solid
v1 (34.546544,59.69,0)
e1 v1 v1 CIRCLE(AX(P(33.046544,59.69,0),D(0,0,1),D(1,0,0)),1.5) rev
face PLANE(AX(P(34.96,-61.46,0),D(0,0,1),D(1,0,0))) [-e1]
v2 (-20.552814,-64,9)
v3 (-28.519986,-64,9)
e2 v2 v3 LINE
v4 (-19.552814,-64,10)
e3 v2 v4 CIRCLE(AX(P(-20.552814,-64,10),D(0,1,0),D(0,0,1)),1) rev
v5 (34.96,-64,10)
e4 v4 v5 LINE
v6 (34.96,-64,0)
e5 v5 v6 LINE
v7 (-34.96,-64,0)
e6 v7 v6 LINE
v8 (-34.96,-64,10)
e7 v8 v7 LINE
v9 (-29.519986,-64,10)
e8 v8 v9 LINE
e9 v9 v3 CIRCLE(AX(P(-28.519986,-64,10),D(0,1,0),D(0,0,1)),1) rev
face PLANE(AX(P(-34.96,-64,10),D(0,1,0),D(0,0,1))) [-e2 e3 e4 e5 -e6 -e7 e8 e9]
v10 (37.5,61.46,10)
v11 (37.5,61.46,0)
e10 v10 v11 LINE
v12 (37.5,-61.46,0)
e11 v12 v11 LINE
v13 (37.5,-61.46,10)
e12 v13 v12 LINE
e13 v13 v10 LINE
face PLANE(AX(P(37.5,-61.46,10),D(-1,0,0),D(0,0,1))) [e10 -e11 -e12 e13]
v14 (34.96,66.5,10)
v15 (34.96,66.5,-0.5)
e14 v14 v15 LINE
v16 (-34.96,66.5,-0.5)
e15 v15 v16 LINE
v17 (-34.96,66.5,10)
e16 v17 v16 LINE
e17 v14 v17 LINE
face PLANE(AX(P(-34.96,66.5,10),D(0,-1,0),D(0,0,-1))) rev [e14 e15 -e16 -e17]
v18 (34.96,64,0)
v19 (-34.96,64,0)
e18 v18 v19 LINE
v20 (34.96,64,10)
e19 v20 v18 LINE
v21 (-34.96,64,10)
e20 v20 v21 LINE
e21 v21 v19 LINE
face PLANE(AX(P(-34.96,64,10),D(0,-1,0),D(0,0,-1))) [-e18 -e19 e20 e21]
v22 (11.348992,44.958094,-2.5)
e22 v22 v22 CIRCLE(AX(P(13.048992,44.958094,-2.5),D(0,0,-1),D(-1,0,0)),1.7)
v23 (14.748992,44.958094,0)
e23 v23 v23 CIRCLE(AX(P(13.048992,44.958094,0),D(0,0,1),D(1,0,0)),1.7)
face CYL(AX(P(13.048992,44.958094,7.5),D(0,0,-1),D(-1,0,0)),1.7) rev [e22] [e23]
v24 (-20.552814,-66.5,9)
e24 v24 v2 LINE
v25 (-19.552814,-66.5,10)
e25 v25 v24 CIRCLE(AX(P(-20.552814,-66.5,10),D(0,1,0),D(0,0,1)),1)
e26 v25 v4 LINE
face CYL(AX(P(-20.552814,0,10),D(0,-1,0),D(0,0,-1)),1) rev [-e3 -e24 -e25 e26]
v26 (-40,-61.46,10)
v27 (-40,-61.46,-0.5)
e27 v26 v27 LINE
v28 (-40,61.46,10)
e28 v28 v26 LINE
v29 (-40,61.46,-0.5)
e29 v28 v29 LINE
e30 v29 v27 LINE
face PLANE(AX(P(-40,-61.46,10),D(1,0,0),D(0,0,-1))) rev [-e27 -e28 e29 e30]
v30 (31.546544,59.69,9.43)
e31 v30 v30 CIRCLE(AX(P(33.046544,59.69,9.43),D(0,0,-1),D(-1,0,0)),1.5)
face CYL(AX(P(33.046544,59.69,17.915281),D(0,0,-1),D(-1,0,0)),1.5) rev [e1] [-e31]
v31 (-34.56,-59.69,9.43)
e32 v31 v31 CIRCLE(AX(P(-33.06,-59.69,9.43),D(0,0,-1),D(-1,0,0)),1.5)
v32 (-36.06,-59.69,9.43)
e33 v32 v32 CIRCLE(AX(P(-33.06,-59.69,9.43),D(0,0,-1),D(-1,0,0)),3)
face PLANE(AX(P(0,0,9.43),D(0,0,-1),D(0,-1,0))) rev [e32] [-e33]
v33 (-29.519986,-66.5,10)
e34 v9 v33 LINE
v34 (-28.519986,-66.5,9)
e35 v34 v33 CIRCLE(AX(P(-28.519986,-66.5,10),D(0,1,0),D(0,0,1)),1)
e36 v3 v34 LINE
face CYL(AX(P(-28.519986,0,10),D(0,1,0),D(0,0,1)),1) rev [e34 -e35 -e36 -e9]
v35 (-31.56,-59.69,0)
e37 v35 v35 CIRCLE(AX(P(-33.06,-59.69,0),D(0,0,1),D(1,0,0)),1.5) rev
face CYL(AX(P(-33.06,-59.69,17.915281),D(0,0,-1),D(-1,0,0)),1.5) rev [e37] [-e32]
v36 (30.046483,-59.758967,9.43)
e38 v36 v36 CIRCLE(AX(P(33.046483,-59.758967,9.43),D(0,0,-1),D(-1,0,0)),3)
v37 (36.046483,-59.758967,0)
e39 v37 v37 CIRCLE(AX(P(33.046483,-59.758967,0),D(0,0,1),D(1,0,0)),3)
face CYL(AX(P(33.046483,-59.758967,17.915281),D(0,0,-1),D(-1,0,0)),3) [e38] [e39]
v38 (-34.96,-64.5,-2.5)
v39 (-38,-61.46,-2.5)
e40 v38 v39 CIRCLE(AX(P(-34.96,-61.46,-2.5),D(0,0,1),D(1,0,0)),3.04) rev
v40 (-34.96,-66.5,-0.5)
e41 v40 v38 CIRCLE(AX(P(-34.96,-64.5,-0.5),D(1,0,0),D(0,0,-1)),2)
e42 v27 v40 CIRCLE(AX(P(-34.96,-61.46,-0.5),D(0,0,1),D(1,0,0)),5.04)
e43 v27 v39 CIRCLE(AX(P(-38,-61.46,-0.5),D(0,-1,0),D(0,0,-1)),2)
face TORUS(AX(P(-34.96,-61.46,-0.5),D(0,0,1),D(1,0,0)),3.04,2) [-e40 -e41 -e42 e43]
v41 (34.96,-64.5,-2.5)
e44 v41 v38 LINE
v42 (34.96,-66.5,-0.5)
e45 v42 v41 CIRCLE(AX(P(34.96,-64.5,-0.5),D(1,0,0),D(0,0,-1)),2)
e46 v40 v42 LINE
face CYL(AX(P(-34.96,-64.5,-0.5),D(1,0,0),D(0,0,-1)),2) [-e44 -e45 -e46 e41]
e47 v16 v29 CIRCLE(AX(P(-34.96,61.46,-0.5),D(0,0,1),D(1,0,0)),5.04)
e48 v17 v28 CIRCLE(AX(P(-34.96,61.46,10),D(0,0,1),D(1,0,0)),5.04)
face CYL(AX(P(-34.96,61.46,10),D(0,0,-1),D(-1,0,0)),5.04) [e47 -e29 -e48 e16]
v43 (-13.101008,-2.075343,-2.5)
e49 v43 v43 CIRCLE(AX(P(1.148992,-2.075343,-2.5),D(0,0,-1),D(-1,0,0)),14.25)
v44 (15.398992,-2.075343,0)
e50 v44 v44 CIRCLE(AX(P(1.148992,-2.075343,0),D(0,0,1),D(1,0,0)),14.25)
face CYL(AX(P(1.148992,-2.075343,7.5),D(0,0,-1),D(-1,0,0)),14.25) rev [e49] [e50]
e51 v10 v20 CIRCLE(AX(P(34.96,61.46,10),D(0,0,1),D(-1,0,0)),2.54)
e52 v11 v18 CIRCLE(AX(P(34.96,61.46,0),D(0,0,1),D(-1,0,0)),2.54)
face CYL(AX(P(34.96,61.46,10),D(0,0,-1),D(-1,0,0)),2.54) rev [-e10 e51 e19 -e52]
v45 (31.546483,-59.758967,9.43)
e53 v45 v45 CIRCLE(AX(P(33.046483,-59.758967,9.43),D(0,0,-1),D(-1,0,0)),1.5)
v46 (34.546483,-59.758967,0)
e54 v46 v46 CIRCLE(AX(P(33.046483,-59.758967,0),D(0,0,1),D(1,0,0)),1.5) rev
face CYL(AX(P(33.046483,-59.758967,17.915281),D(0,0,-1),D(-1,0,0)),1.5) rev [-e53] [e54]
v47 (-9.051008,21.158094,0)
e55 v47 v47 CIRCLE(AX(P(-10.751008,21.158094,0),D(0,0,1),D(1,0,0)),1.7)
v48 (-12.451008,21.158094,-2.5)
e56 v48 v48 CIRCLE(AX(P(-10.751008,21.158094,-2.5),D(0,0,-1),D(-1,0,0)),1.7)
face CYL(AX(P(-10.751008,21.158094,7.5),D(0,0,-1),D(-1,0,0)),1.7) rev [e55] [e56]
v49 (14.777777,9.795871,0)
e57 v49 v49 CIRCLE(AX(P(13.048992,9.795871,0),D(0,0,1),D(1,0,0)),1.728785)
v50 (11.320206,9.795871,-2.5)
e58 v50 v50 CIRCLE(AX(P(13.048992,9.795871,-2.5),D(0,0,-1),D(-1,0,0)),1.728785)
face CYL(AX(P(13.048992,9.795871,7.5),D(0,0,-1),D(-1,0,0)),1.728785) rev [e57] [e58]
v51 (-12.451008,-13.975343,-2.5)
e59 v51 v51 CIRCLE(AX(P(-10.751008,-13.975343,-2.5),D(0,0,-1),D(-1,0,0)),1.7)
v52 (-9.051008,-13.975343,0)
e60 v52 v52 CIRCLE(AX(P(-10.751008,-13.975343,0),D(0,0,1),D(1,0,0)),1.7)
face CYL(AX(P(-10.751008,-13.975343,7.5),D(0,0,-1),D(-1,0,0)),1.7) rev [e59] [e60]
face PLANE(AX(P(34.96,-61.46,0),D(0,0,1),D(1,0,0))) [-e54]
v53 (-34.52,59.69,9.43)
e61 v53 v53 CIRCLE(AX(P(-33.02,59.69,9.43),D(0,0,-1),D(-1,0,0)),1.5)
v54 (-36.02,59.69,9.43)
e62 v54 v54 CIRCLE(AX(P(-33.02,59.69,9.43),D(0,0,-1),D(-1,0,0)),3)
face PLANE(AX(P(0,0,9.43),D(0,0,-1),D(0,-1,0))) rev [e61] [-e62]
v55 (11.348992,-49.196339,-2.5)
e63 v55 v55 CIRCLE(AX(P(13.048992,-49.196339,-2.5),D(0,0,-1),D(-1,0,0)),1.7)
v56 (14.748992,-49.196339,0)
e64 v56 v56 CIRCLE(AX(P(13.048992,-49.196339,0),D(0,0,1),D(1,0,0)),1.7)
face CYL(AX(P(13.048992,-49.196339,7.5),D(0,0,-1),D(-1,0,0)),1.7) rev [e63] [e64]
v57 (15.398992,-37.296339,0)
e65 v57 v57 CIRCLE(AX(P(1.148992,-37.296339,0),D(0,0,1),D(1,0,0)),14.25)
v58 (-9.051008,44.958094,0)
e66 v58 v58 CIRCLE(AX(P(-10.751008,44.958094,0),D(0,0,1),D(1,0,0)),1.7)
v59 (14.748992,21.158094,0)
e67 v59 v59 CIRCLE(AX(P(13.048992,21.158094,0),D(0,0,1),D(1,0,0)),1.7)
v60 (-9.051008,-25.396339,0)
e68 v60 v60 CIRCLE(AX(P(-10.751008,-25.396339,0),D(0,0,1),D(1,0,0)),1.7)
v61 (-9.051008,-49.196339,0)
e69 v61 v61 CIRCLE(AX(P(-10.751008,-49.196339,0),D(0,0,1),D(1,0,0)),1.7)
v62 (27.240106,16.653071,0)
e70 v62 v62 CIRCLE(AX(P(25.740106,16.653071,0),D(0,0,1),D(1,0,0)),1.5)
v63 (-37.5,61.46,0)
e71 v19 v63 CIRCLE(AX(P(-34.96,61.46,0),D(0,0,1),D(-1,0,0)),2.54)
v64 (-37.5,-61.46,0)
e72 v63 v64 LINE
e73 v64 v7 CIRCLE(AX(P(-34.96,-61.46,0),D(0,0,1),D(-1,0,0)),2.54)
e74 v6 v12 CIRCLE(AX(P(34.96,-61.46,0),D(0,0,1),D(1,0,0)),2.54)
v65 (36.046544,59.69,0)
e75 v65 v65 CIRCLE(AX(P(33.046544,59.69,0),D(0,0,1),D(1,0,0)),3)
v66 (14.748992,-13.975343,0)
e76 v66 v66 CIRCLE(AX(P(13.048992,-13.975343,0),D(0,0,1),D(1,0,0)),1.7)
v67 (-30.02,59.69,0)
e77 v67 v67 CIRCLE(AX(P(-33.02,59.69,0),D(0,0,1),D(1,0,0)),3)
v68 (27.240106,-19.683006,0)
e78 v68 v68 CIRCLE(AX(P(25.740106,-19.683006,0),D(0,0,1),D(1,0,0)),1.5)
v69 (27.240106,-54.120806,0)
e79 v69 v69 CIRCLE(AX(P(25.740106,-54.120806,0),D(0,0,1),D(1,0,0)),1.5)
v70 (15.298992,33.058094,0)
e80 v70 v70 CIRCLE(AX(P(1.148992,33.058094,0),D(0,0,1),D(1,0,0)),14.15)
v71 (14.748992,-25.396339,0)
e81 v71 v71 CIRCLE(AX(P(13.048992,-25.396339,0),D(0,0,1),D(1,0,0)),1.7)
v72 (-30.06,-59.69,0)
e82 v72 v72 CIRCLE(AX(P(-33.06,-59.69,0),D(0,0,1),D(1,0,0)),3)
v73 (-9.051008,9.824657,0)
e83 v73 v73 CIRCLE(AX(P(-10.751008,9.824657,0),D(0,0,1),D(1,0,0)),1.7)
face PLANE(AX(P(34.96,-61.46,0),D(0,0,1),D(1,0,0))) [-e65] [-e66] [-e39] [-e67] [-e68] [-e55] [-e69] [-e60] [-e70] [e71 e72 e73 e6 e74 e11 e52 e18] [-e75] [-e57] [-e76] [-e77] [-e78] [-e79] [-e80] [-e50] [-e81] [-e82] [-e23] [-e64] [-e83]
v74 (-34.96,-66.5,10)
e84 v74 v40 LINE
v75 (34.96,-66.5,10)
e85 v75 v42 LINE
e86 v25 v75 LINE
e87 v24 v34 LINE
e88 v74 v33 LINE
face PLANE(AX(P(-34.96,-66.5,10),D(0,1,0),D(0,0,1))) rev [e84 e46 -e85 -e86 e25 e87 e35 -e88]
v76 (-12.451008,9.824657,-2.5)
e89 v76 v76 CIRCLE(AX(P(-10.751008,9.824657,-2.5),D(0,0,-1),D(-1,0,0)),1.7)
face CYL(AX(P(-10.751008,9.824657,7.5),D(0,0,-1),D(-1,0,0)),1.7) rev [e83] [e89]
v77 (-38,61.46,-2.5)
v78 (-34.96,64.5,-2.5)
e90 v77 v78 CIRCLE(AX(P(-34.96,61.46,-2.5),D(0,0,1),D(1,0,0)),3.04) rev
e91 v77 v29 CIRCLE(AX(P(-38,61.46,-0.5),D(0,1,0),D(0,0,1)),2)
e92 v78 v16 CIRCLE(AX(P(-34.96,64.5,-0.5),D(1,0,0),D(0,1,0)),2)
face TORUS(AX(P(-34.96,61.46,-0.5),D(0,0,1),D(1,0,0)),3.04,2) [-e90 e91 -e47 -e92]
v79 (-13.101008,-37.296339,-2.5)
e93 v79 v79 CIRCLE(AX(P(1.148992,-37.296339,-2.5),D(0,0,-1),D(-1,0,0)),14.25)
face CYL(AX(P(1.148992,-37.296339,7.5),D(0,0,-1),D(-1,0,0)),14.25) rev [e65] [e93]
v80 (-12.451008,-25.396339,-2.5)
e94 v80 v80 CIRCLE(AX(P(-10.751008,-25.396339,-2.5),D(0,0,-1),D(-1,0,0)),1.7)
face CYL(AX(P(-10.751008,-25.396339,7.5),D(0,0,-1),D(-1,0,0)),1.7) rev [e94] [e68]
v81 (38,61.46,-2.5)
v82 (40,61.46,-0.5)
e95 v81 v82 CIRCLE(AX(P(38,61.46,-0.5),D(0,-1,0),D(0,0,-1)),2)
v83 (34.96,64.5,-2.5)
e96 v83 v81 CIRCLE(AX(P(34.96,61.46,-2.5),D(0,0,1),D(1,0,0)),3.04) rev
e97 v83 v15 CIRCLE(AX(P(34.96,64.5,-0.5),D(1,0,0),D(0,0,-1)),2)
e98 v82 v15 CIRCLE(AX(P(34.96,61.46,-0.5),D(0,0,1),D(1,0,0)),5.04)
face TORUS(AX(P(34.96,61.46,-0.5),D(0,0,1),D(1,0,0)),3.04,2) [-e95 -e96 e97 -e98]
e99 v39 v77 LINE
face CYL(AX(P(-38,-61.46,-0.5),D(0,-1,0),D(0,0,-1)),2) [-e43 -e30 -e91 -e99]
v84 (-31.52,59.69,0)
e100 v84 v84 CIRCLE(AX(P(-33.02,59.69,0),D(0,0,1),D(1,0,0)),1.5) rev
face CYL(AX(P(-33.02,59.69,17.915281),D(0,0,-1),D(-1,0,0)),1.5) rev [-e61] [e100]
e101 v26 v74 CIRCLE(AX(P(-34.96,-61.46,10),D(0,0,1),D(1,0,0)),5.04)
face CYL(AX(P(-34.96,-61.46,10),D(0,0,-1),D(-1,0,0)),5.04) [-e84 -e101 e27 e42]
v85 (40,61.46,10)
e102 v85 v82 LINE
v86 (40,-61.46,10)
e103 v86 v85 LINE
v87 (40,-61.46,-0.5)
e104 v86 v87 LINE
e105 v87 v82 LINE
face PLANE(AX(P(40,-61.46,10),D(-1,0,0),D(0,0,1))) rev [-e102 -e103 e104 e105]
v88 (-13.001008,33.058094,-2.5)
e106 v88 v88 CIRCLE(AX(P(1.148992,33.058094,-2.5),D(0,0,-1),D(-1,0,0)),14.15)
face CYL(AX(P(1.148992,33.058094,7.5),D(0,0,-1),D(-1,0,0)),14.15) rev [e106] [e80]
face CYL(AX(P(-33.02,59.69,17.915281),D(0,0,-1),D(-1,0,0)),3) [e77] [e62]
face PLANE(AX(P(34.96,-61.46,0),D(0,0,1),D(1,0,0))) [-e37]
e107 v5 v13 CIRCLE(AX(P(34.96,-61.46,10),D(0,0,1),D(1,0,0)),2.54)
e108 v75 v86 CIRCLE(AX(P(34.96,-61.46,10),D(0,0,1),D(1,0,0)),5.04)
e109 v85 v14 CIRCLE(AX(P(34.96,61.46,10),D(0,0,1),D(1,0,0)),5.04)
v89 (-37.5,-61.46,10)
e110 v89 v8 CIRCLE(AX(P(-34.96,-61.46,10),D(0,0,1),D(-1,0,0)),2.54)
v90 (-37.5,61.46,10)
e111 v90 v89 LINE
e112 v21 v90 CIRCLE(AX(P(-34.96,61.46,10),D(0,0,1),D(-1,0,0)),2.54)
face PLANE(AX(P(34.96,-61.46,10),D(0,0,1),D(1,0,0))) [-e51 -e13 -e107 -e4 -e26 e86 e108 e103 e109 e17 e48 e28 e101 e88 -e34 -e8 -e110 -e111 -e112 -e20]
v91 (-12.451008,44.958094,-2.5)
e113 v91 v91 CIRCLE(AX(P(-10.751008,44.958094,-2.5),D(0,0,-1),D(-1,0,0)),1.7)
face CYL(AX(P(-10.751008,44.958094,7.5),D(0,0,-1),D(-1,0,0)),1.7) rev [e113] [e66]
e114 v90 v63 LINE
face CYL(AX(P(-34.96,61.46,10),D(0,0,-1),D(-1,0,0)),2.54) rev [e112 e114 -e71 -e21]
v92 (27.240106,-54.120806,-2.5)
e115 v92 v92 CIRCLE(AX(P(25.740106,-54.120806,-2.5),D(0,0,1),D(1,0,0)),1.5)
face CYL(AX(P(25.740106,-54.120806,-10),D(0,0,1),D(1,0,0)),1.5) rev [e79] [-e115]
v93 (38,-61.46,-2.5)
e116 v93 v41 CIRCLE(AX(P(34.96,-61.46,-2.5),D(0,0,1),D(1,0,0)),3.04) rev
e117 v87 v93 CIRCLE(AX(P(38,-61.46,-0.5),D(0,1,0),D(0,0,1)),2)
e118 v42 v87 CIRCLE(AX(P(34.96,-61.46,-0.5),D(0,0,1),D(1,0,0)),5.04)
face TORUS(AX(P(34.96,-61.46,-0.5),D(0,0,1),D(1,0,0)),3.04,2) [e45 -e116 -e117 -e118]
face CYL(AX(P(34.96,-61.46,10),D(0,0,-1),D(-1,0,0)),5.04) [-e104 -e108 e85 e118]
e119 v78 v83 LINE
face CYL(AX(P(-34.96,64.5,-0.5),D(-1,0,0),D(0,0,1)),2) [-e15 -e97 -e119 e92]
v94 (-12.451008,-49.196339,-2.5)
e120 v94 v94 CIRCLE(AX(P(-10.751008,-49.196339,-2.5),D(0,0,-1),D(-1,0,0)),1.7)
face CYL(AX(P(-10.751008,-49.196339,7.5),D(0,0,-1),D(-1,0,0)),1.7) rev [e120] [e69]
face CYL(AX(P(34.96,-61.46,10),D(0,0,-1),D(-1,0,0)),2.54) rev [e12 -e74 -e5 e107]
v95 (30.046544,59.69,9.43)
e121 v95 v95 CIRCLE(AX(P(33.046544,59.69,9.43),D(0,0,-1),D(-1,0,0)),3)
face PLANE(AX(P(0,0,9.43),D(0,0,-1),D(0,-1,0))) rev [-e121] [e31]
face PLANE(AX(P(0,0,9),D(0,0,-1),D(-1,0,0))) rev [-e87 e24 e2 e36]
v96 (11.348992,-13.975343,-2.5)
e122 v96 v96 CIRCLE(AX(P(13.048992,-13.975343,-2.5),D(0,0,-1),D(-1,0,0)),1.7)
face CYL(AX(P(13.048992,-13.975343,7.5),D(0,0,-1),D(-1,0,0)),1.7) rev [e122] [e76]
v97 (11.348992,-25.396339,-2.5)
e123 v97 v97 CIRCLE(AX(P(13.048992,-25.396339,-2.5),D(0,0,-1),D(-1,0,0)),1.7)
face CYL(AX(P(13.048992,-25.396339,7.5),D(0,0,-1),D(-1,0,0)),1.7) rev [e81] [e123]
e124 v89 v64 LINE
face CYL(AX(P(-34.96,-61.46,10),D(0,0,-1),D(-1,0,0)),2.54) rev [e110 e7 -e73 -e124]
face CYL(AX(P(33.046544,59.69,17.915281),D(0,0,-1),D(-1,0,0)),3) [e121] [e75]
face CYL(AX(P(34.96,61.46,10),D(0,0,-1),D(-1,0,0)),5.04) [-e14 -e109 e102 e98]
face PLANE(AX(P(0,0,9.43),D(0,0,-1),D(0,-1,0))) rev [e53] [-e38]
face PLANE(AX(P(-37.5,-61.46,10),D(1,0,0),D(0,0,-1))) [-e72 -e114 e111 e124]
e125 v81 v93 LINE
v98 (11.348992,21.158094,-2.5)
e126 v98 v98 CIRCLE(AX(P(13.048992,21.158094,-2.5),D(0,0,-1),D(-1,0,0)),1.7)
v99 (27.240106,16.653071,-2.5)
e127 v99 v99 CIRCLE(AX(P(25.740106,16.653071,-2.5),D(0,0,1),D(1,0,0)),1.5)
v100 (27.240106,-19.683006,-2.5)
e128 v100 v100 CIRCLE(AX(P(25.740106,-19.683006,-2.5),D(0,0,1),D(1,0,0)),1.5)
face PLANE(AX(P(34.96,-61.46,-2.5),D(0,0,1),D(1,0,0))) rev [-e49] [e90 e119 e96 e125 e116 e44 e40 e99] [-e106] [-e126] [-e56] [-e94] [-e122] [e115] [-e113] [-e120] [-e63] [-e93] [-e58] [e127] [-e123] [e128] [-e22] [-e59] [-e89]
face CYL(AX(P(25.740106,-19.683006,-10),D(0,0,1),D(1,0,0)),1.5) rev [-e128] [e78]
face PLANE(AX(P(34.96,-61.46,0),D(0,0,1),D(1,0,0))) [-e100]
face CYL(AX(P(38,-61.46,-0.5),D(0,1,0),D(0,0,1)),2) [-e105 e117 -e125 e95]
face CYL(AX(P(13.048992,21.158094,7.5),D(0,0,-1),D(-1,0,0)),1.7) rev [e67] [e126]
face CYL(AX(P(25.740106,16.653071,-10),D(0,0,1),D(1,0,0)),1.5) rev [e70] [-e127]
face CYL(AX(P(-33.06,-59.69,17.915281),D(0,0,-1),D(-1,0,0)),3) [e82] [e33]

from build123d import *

# Parameters (mm, degrees)
BOSS_EXTRU_1_DEPTH      = 10
COQUE1_T                = 2.5
CONG_1_R                = 2
ESQUISSE3_R             = 3
ESQUISSE3_R_2           = 1.5
BOSS_EXTRU_2_DEPTH      = 9.43
ESQUISSE4_W             = 9.967172774
ESQUISSE4_H             = 2.559848265
ENL_V_MAT_EXTRU_2_DEPTH = 1
CONG_4_R                = 1
ESQUISSE5_R             = 1.7
ESQUISSE5_R_2           = 1.728785314
ESQUISSE5_R_3           = 14.25
ESQUISSE5_R_4           = 14.15
ENL_V_MAT_EXTRU_3_DEPTH = 10
ESQUISSE6_R             = 1.5
ENL_V_MAT_EXTRU_4_DEPTH = 10


# Some blends are built 0.0001 mm under size
with BuildPart() as part:
    # Esquisse1 → Boss.-Extru.1 (new body)
    with BuildSketch(Plane.XY):
        with BuildLine():
            Line((-34.96, -64), (34.96, -64))
            ThreePointArc((34.96, -64), (36.756051224, -63.256051224), (37.5, -61.46))
            Line((37.5, -61.46), (37.5, 61.46))
            ThreePointArc((37.5, 61.46), (36.756051224, 63.256051224), (34.96, 64))
            Line((34.96, 64), (-34.96, 64))
            ThreePointArc((-34.96, 64), (-36.756051224, 63.256051224), (-37.5, 61.46))
            Line((-37.5, 61.46), (-37.5, -61.46))
            ThreePointArc((-37.5, -61.46), (-36.756051224, -63.256051224), (-34.96, -64))
        make_face()
    extrude(amount=BOSS_EXTRU_1_DEPTH)

    # Coque1
    coque1_openings = [part.faces().sort_by_distance(p)[0] for p in [
        (0, 0, 10),
    ]]
    offset(amount=COQUE1_T, openings=coque1_openings, kind=Kind.INTERSECTION)

    # Congé1
    # the kernel refuses this fillet: 2 mm, written as the material it takes off along each edge
    with BuildSketch(Plane(origin=(34.96, 66.5, -2.5), x_dir=(0, 0, 1), z_dir=(-1, 0, 0)), Plane(origin=(-34.96, -66.5, -2.5), x_dir=(0, 0, 1), z_dir=(1, 0, 0))) as cong_1_piece_1:
        with BuildLine():
            CenterArc((CONG_1_R, -CONG_1_R), CONG_1_R, 90, 90)
            Line((0, -CONG_1_R), (0, 0))
            Line((0, 0), (CONG_1_R, 0))
        make_face()
    extrude(amount=69.92, mode=Mode.SUBTRACT)
    with BuildSketch(Plane(origin=(34.96, 61.46, -2.5), x_dir=(0, 1, 0), z_dir=(-1, 0, 0))) as cong_1_piece_2:
        with BuildLine():
            CenterArc((5.04 - CONG_1_R, -CONG_1_R), CONG_1_R, 0, 90)
            Line((5.04 - CONG_1_R, 0), (5.04, 0))
            Line((5.04, 0), (5.04, -CONG_1_R))
        make_face()
    revolve(axis=Axis((34.96, 61.46, -2.5), (0, 0, -1)), revolution_arc=90, mode=Mode.SUBTRACT)
    with BuildSketch(Plane(origin=(40, -61.46, -2.5), x_dir=(0, 0, 1), z_dir=(0, 1, 0)), Plane(origin=(-40, 61.46, -2.5), x_dir=(0, 0, 1), z_dir=(0, -1, 0))) as cong_1_piece_3:
        with BuildLine():
            CenterArc((CONG_1_R, -CONG_1_R), CONG_1_R, 90, 90)
            Line((0, -CONG_1_R), (0, 0))
            Line((0, 0), (CONG_1_R, 0))
        make_face()
    extrude(amount=122.92, mode=Mode.SUBTRACT)
    with BuildSketch(Plane(origin=(34.96, -61.46, -2.5), x_dir=(1, 0, 0), z_dir=(0, 1, 0))) as cong_1_piece_4:
        with BuildLine():
            CenterArc((5.04 - CONG_1_R, -CONG_1_R), CONG_1_R, 0, 90)
            Line((5.04 - CONG_1_R, 0), (5.04, 0))
            Line((5.04, 0), (5.04, -CONG_1_R))
        make_face()
    revolve(axis=Axis((34.96, -61.46, -2.5), (0, 0, -1)), revolution_arc=90, mode=Mode.SUBTRACT)
    with BuildSketch(Plane(origin=(-34.96, -61.46, -2.5), x_dir=(0, -1, 0), z_dir=(1, 0, 0))) as cong_1_piece_5:
        with BuildLine():
            CenterArc((5.04 - CONG_1_R, -CONG_1_R), CONG_1_R, 0, 90)
            Line((5.04 - CONG_1_R, 0), (5.04, 0))
            Line((5.04, 0), (5.04, -CONG_1_R))
        make_face()
    revolve(axis=Axis((-34.96, -61.46, -2.5), (0, 0, -1)), revolution_arc=90, mode=Mode.SUBTRACT)
    with BuildSketch(Plane(origin=(-34.96, 61.46, -2.5), x_dir=(-1, 0, 0), z_dir=(0, -1, 0))) as cong_1_piece_6:
        with BuildLine():
            CenterArc((5.04 - CONG_1_R, -CONG_1_R), CONG_1_R, 0, 90)
            Line((5.04 - CONG_1_R, 0), (5.04, 0))
            Line((5.04, 0), (5.04, -CONG_1_R))
        make_face()
    revolve(axis=Axis((-34.96, 61.46, -2.5), (0, 0, -1)), revolution_arc=90, mode=Mode.SUBTRACT)

    # Esquisse3 → Boss.-Extru.2 (add)
    # profile 1 of 4: a face of its own
    with BuildSketch(Plane.XY):
        with Locations(Location((-33.02, 59.69, 0), (0, 0, 180))):
            Circle(ESQUISSE3_R)
        with Locations(Location((-33.02, 59.69, 0), (0, 0, 180))):
            Circle(ESQUISSE3_R_2, mode=Mode.SUBTRACT)
    # profile 2 of 4: a face of its own
    with BuildSketch(Plane.XY):
        with Locations(Location((33.046544, 59.69, 0), (0, 0, 180))):
            Circle(ESQUISSE3_R)
        with Locations(Location((33.046544, 59.69, 0), (0, 0, 180))):
            Circle(ESQUISSE3_R_2, mode=Mode.SUBTRACT)
    # profile 3 of 4: a face of its own
    with BuildSketch(Plane.XY):
        with Locations(Location((-33.06, -59.69, 0), (0, 0, 180))):
            Circle(ESQUISSE3_R)
        with Locations(Location((-33.06, -59.69, 0), (0, 0, 180))):
            Circle(ESQUISSE3_R_2, mode=Mode.SUBTRACT)
    # profile 4 of 4: a face of its own
    with BuildSketch(Plane.XY):
        with Locations(Location((33.046483, -59.75896698, 0), (0, 0, 180))):
            Circle(ESQUISSE3_R)
        with Locations(Location((33.046483, -59.75896698, 0), (0, 0, 180))):
            Circle(ESQUISSE3_R_2, mode=Mode.SUBTRACT)
    extrude(amount=BOSS_EXTRU_2_DEPTH)

    # Esquisse4 → Enlèv. mat.-Extru.2 (cut)
    with BuildSketch(Plane.XY.offset(10)):
        with Locations((-24.5364, -65.279924132)):
            Rectangle(ESQUISSE4_W, ESQUISSE4_H)
    extrude(amount=-ENL_V_MAT_EXTRU_2_DEPTH, mode=Mode.SUBTRACT)

    # Congé4
    cong_4_edges = [part.edges().sort_by_distance(p)[0] for p in [
        (-19.552813613, -65.25, 9),
        (-29.519986387, -65.25, 9),
    ]]
    fillet(cong_4_edges, radius=CONG_4_R - 0.0001)  # a hair under: the kernel refuses the full size

    # Esquisse5 → Enlèv. mat.-Extru.3 (cut)
    with BuildSketch(Plane(origin=(0, 0, -2.5), x_dir=(-1, 0, 0), z_dir=(0, 0, -1))):
        with Locations((-13.048991778, 44.95809385)):
            Circle(ESQUISSE5_R)
        with Locations((10.751008222, 44.95809385)):
            Circle(ESQUISSE5_R)
        with Locations((10.751008222, 21.15809385)):
            Circle(ESQUISSE5_R)
        with Locations((-13.048991778, 21.15809385)):
            Circle(ESQUISSE5_R)
        with Locations((-13.048991778, 9.795871187)):
            Circle(ESQUISSE5_R_2)
        with Locations((10.751008222, 9.824656501)):
            Circle(ESQUISSE5_R)
        with Locations((10.751008222, -13.975343499)):
            Circle(ESQUISSE5_R)
        with Locations((-13.048991778, -13.975343499)):
            Circle(ESQUISSE5_R)
        with Locations((-13.048991778, -25.396338685)):
            Circle(ESQUISSE5_R)
        with Locations((10.751008222, -25.396338685)):
            Circle(ESQUISSE5_R)
        with Locations((10.751008222, -49.196338685)):
            Circle(ESQUISSE5_R)
        with Locations((-13.048991778, -49.196338685)):
            Circle(ESQUISSE5_R)
        with Locations((-1.148991778, -37.296338685)):
            Circle(ESQUISSE5_R_3)
        with Locations((-1.148991778, -2.075343499)):
            Circle(ESQUISSE5_R_3)
        with Locations((-1.148991778, 33.05809385)):
            Circle(ESQUISSE5_R_4)
    extrude(amount=-ENL_V_MAT_EXTRU_3_DEPTH, mode=Mode.SUBTRACT)

    # Esquisse6 → Enlèv. mat.-Extru.4 (cut)
    with BuildSketch(Plane.XY):
        with Locations((25.740105724, 16.653070924)):
            Circle(ESQUISSE6_R)
        with Locations((25.740105724, -19.683006416)):
            Circle(ESQUISSE6_R)
        with Locations((25.740105724, -54.120805544)):
            Circle(ESQUISSE6_R)
    extrude(amount=-ENL_V_MAT_EXTRU_4_DEPTH, mode=Mode.SUBTRACT)


solid = part.part
